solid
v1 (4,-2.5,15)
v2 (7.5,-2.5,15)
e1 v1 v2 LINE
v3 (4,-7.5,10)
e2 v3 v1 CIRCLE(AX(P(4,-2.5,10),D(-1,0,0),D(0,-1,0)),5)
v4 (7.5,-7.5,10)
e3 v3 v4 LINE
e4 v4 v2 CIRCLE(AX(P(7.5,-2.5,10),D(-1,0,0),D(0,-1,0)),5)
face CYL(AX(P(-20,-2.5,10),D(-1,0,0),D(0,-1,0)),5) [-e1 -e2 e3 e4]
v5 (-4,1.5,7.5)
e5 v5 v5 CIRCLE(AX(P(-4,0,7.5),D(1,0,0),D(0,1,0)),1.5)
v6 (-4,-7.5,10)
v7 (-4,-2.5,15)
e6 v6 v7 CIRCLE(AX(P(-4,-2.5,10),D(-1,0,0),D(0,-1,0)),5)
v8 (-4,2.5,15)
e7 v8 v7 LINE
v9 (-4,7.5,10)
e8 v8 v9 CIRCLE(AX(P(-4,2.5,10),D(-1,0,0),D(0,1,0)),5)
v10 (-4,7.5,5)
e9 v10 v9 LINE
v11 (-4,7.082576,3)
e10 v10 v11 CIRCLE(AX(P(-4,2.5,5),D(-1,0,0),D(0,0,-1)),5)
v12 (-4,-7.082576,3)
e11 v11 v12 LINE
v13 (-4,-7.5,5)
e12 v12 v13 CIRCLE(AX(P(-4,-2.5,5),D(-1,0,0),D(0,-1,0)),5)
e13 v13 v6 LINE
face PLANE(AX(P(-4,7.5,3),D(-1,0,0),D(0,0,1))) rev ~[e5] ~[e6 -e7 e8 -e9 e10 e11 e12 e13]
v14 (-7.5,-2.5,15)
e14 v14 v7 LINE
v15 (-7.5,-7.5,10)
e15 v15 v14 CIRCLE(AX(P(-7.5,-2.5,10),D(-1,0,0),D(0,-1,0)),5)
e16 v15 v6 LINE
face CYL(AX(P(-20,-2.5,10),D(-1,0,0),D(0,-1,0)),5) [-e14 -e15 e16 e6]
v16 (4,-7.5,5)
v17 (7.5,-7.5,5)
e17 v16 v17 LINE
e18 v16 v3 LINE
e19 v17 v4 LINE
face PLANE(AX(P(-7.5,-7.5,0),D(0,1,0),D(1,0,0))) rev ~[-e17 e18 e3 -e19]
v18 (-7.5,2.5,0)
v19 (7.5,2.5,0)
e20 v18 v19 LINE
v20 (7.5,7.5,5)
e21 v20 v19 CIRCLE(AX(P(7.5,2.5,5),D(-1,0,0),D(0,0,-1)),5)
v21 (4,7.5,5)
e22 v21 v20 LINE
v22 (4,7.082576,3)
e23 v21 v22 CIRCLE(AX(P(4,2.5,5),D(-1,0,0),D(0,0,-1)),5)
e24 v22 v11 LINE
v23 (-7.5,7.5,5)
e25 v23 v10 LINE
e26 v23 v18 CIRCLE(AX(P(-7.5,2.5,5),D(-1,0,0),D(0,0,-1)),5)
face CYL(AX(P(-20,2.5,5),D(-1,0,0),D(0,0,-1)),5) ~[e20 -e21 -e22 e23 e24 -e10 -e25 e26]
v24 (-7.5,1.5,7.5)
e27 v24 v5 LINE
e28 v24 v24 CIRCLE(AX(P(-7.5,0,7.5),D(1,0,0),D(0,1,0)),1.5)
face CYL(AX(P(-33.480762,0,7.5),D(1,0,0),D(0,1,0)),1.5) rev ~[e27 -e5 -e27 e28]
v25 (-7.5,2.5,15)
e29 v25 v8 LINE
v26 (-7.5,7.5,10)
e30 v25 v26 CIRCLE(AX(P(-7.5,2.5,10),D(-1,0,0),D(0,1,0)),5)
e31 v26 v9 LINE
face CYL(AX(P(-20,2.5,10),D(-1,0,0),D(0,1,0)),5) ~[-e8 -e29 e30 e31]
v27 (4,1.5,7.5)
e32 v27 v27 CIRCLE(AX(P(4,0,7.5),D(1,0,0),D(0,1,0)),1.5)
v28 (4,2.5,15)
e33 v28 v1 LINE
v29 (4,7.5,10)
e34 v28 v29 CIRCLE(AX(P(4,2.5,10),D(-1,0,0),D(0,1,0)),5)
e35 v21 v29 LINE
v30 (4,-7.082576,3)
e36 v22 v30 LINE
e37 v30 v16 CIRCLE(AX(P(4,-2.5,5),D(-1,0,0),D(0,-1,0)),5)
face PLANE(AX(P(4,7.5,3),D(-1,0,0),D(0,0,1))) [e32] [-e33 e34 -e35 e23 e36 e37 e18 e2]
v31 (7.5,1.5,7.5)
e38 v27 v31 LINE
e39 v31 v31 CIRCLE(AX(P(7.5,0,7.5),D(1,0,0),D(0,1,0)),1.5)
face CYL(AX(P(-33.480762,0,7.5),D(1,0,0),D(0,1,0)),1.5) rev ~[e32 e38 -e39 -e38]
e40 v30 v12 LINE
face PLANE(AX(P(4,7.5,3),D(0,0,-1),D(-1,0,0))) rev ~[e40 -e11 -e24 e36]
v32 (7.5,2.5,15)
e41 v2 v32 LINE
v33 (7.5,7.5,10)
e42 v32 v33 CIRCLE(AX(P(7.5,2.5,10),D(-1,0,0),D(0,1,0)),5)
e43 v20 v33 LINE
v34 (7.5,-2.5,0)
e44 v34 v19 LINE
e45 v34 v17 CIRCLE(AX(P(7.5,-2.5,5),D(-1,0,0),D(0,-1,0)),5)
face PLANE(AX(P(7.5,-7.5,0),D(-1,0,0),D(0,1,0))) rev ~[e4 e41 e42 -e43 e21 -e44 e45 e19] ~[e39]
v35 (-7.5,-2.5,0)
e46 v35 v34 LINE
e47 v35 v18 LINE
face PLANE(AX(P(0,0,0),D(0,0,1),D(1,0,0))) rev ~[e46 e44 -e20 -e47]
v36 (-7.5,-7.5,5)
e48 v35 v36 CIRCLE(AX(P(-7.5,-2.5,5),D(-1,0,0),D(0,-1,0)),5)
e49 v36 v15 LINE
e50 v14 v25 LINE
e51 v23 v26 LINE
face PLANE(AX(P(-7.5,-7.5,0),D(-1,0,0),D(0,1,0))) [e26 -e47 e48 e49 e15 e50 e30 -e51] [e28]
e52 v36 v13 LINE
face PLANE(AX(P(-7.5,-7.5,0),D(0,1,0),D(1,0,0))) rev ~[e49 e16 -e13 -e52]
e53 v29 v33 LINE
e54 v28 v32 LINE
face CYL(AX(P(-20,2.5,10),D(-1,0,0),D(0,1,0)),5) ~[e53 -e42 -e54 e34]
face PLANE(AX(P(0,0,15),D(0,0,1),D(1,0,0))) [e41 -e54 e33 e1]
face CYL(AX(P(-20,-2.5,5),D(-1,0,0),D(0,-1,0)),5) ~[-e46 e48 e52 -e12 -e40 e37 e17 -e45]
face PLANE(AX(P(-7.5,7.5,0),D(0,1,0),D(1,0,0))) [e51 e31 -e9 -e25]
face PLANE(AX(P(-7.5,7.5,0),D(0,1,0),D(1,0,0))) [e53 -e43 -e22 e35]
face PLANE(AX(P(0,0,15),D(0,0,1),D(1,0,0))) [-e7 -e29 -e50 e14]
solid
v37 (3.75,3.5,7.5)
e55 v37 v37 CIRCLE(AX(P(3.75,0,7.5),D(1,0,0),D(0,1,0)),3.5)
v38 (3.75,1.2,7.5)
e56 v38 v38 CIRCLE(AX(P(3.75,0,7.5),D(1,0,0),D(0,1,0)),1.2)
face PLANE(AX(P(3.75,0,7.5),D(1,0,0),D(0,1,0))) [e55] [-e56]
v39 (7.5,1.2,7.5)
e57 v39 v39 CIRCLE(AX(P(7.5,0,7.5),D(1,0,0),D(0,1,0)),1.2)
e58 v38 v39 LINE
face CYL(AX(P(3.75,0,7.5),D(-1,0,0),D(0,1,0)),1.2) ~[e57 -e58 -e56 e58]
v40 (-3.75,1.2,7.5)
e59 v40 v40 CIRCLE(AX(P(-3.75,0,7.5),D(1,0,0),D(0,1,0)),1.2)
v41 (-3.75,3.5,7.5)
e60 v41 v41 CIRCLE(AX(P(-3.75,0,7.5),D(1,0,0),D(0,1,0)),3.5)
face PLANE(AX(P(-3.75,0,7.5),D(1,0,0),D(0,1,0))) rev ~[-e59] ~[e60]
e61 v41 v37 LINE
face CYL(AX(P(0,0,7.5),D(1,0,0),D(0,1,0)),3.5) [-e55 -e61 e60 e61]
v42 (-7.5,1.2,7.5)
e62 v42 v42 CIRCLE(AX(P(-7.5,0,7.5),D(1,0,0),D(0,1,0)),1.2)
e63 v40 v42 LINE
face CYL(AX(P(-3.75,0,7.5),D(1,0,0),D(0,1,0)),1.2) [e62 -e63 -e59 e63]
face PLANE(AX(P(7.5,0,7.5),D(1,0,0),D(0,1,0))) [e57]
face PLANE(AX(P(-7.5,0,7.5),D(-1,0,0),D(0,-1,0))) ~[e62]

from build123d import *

# Parameters (mm, degrees)
F0_W         = 15
F0_H         = 15
F1_DEPTH     = 15
F3_D         = 3
F4_W         = 8
F4_H         = 12
F5_DEPTH     = 15.001
F6_R         = 3.5
F7_DEPTH     = 3.75
F8_R         = 1.2
F9_DEPTH     = 3.75
F10_T1_DEPTH = 28.5
F10_T3_DEPTH = 28.5
F10_T5_DEPTH = 40


# Not quite as in the source:
# - a fillet or chamfer that OpenCascade refuses, or shapes differently, is made with other operations: its cross-section is extruded or revolved along the edge and cut away or added
# - a pattern or mirror of a feature is missing from the dataset's text; its kind, count and spacing are read off the source's solid


with BuildPart() as f1:
    # F0 (on Top) → F1 (new body)
    with BuildSketch(Plane.XY):
        Rectangle(F0_W, F0_H)
    extrude(amount=F1_DEPTH)

    # F3 (through all)
    with Locations(Plane(origin=(-7.5, 0, 0), x_dir=(0, -1, 0), z_dir=(-1, 0, 0))):
        with Locations((0, 7.5)):
            Hole(F3_D / 2)

    # F4 (on face) → F5 (cut, through all)
    with BuildSketch(Plane(origin=(0, 7.5, 0), x_dir=(-1, 0, 0), z_dir=(0, 1, 0))):
        with Locations((0, 9)):
            Rectangle(F4_W, F4_H)
    extrude(amount=-F5_DEPTH, mode=Mode.SUBTRACT)

    # F10: fillet of radius 5 on 6 edges, made by hand

    # F10_s2 → F10_t1 (cut)
    with BuildSketch(Plane.YZ.offset(-20)):
        with BuildLine():
            ThreePointArc((-7.5, 10), (-6.0355339059, 13.5355339059), (-2.5, 15))
            Line((-2.5, 15), (-7.5, 15))
            Line((-7.5, 15), (-7.5, 10))
        make_face()
        with BuildLine():
            ThreePointArc((7.5, 10), (6.0355339059, 13.5355339059), (2.5, 15))
            Line((2.5, 15), (7.5, 15))
            Line((7.5, 15), (7.5, 10))
        make_face()
    extrude(amount=F10_T1_DEPTH, mode=Mode.SUBTRACT)

    # F10_s4 → F10_t3 (cut)
    with BuildSketch(Plane.YZ.offset(-8.5)):
        with BuildLine():
            ThreePointArc((-7.5, 10), (-6.0355339059, 13.5355339059), (-2.5, 15))
            Line((-2.5, 15), (-7.5, 15))
            Line((-7.5, 15), (-7.5, 10))
        make_face()
        with BuildLine():
            ThreePointArc((2.5, 15), (6.0355339059, 13.5355339059), (7.5, 10))
            Line((7.5, 10), (7.5, 15))
            Line((7.5, 15), (2.5, 15))
        make_face()
    extrude(amount=F10_T3_DEPTH, mode=Mode.SUBTRACT)

    # F10_s6 → F10_t5 (cut)
    with BuildSketch(Plane.YZ.offset(-20)):
        with BuildLine():
            ThreePointArc((2.5, 0), (6.0355339059, 1.4644660941), (7.5, 5))
            Line((7.5, 5), (7.5, 0))
            Line((7.5, 0), (2.5, 0))
        make_face()
        with BuildLine():
            ThreePointArc((-7.5, 5), (-6.0355339059, 1.4644660941), (-2.5, 0))
            Line((-2.5, 0), (-7.5, 0))
            Line((-7.5, 0), (-7.5, 5))
        make_face()
    extrude(amount=F10_T5_DEPTH, mode=Mode.SUBTRACT)


with BuildPart() as f7:
    # F6 (on Right) → F7 (new body, symmetric)
    with BuildSketch(Plane.YZ):
        with Locations((0, 7.5)):
            Circle(F6_R)
    extrude(amount=F7_DEPTH, both=True)

    # F8 (on face) → F9 (join)
    with BuildSketch(Plane.YZ.offset(3.75)):
        with Locations((0, 7.5)):
            Circle(F8_R)
    f9 = extrude(amount=F9_DEPTH)

    # F9_copies: F9 across plane
    add(f9.mirror(Plane(origin=(0, 0, 0), x_dir=(0, 0, -1), z_dir=(-1, 0, 0))))


solid = Compound([f1.part, f7.part])
